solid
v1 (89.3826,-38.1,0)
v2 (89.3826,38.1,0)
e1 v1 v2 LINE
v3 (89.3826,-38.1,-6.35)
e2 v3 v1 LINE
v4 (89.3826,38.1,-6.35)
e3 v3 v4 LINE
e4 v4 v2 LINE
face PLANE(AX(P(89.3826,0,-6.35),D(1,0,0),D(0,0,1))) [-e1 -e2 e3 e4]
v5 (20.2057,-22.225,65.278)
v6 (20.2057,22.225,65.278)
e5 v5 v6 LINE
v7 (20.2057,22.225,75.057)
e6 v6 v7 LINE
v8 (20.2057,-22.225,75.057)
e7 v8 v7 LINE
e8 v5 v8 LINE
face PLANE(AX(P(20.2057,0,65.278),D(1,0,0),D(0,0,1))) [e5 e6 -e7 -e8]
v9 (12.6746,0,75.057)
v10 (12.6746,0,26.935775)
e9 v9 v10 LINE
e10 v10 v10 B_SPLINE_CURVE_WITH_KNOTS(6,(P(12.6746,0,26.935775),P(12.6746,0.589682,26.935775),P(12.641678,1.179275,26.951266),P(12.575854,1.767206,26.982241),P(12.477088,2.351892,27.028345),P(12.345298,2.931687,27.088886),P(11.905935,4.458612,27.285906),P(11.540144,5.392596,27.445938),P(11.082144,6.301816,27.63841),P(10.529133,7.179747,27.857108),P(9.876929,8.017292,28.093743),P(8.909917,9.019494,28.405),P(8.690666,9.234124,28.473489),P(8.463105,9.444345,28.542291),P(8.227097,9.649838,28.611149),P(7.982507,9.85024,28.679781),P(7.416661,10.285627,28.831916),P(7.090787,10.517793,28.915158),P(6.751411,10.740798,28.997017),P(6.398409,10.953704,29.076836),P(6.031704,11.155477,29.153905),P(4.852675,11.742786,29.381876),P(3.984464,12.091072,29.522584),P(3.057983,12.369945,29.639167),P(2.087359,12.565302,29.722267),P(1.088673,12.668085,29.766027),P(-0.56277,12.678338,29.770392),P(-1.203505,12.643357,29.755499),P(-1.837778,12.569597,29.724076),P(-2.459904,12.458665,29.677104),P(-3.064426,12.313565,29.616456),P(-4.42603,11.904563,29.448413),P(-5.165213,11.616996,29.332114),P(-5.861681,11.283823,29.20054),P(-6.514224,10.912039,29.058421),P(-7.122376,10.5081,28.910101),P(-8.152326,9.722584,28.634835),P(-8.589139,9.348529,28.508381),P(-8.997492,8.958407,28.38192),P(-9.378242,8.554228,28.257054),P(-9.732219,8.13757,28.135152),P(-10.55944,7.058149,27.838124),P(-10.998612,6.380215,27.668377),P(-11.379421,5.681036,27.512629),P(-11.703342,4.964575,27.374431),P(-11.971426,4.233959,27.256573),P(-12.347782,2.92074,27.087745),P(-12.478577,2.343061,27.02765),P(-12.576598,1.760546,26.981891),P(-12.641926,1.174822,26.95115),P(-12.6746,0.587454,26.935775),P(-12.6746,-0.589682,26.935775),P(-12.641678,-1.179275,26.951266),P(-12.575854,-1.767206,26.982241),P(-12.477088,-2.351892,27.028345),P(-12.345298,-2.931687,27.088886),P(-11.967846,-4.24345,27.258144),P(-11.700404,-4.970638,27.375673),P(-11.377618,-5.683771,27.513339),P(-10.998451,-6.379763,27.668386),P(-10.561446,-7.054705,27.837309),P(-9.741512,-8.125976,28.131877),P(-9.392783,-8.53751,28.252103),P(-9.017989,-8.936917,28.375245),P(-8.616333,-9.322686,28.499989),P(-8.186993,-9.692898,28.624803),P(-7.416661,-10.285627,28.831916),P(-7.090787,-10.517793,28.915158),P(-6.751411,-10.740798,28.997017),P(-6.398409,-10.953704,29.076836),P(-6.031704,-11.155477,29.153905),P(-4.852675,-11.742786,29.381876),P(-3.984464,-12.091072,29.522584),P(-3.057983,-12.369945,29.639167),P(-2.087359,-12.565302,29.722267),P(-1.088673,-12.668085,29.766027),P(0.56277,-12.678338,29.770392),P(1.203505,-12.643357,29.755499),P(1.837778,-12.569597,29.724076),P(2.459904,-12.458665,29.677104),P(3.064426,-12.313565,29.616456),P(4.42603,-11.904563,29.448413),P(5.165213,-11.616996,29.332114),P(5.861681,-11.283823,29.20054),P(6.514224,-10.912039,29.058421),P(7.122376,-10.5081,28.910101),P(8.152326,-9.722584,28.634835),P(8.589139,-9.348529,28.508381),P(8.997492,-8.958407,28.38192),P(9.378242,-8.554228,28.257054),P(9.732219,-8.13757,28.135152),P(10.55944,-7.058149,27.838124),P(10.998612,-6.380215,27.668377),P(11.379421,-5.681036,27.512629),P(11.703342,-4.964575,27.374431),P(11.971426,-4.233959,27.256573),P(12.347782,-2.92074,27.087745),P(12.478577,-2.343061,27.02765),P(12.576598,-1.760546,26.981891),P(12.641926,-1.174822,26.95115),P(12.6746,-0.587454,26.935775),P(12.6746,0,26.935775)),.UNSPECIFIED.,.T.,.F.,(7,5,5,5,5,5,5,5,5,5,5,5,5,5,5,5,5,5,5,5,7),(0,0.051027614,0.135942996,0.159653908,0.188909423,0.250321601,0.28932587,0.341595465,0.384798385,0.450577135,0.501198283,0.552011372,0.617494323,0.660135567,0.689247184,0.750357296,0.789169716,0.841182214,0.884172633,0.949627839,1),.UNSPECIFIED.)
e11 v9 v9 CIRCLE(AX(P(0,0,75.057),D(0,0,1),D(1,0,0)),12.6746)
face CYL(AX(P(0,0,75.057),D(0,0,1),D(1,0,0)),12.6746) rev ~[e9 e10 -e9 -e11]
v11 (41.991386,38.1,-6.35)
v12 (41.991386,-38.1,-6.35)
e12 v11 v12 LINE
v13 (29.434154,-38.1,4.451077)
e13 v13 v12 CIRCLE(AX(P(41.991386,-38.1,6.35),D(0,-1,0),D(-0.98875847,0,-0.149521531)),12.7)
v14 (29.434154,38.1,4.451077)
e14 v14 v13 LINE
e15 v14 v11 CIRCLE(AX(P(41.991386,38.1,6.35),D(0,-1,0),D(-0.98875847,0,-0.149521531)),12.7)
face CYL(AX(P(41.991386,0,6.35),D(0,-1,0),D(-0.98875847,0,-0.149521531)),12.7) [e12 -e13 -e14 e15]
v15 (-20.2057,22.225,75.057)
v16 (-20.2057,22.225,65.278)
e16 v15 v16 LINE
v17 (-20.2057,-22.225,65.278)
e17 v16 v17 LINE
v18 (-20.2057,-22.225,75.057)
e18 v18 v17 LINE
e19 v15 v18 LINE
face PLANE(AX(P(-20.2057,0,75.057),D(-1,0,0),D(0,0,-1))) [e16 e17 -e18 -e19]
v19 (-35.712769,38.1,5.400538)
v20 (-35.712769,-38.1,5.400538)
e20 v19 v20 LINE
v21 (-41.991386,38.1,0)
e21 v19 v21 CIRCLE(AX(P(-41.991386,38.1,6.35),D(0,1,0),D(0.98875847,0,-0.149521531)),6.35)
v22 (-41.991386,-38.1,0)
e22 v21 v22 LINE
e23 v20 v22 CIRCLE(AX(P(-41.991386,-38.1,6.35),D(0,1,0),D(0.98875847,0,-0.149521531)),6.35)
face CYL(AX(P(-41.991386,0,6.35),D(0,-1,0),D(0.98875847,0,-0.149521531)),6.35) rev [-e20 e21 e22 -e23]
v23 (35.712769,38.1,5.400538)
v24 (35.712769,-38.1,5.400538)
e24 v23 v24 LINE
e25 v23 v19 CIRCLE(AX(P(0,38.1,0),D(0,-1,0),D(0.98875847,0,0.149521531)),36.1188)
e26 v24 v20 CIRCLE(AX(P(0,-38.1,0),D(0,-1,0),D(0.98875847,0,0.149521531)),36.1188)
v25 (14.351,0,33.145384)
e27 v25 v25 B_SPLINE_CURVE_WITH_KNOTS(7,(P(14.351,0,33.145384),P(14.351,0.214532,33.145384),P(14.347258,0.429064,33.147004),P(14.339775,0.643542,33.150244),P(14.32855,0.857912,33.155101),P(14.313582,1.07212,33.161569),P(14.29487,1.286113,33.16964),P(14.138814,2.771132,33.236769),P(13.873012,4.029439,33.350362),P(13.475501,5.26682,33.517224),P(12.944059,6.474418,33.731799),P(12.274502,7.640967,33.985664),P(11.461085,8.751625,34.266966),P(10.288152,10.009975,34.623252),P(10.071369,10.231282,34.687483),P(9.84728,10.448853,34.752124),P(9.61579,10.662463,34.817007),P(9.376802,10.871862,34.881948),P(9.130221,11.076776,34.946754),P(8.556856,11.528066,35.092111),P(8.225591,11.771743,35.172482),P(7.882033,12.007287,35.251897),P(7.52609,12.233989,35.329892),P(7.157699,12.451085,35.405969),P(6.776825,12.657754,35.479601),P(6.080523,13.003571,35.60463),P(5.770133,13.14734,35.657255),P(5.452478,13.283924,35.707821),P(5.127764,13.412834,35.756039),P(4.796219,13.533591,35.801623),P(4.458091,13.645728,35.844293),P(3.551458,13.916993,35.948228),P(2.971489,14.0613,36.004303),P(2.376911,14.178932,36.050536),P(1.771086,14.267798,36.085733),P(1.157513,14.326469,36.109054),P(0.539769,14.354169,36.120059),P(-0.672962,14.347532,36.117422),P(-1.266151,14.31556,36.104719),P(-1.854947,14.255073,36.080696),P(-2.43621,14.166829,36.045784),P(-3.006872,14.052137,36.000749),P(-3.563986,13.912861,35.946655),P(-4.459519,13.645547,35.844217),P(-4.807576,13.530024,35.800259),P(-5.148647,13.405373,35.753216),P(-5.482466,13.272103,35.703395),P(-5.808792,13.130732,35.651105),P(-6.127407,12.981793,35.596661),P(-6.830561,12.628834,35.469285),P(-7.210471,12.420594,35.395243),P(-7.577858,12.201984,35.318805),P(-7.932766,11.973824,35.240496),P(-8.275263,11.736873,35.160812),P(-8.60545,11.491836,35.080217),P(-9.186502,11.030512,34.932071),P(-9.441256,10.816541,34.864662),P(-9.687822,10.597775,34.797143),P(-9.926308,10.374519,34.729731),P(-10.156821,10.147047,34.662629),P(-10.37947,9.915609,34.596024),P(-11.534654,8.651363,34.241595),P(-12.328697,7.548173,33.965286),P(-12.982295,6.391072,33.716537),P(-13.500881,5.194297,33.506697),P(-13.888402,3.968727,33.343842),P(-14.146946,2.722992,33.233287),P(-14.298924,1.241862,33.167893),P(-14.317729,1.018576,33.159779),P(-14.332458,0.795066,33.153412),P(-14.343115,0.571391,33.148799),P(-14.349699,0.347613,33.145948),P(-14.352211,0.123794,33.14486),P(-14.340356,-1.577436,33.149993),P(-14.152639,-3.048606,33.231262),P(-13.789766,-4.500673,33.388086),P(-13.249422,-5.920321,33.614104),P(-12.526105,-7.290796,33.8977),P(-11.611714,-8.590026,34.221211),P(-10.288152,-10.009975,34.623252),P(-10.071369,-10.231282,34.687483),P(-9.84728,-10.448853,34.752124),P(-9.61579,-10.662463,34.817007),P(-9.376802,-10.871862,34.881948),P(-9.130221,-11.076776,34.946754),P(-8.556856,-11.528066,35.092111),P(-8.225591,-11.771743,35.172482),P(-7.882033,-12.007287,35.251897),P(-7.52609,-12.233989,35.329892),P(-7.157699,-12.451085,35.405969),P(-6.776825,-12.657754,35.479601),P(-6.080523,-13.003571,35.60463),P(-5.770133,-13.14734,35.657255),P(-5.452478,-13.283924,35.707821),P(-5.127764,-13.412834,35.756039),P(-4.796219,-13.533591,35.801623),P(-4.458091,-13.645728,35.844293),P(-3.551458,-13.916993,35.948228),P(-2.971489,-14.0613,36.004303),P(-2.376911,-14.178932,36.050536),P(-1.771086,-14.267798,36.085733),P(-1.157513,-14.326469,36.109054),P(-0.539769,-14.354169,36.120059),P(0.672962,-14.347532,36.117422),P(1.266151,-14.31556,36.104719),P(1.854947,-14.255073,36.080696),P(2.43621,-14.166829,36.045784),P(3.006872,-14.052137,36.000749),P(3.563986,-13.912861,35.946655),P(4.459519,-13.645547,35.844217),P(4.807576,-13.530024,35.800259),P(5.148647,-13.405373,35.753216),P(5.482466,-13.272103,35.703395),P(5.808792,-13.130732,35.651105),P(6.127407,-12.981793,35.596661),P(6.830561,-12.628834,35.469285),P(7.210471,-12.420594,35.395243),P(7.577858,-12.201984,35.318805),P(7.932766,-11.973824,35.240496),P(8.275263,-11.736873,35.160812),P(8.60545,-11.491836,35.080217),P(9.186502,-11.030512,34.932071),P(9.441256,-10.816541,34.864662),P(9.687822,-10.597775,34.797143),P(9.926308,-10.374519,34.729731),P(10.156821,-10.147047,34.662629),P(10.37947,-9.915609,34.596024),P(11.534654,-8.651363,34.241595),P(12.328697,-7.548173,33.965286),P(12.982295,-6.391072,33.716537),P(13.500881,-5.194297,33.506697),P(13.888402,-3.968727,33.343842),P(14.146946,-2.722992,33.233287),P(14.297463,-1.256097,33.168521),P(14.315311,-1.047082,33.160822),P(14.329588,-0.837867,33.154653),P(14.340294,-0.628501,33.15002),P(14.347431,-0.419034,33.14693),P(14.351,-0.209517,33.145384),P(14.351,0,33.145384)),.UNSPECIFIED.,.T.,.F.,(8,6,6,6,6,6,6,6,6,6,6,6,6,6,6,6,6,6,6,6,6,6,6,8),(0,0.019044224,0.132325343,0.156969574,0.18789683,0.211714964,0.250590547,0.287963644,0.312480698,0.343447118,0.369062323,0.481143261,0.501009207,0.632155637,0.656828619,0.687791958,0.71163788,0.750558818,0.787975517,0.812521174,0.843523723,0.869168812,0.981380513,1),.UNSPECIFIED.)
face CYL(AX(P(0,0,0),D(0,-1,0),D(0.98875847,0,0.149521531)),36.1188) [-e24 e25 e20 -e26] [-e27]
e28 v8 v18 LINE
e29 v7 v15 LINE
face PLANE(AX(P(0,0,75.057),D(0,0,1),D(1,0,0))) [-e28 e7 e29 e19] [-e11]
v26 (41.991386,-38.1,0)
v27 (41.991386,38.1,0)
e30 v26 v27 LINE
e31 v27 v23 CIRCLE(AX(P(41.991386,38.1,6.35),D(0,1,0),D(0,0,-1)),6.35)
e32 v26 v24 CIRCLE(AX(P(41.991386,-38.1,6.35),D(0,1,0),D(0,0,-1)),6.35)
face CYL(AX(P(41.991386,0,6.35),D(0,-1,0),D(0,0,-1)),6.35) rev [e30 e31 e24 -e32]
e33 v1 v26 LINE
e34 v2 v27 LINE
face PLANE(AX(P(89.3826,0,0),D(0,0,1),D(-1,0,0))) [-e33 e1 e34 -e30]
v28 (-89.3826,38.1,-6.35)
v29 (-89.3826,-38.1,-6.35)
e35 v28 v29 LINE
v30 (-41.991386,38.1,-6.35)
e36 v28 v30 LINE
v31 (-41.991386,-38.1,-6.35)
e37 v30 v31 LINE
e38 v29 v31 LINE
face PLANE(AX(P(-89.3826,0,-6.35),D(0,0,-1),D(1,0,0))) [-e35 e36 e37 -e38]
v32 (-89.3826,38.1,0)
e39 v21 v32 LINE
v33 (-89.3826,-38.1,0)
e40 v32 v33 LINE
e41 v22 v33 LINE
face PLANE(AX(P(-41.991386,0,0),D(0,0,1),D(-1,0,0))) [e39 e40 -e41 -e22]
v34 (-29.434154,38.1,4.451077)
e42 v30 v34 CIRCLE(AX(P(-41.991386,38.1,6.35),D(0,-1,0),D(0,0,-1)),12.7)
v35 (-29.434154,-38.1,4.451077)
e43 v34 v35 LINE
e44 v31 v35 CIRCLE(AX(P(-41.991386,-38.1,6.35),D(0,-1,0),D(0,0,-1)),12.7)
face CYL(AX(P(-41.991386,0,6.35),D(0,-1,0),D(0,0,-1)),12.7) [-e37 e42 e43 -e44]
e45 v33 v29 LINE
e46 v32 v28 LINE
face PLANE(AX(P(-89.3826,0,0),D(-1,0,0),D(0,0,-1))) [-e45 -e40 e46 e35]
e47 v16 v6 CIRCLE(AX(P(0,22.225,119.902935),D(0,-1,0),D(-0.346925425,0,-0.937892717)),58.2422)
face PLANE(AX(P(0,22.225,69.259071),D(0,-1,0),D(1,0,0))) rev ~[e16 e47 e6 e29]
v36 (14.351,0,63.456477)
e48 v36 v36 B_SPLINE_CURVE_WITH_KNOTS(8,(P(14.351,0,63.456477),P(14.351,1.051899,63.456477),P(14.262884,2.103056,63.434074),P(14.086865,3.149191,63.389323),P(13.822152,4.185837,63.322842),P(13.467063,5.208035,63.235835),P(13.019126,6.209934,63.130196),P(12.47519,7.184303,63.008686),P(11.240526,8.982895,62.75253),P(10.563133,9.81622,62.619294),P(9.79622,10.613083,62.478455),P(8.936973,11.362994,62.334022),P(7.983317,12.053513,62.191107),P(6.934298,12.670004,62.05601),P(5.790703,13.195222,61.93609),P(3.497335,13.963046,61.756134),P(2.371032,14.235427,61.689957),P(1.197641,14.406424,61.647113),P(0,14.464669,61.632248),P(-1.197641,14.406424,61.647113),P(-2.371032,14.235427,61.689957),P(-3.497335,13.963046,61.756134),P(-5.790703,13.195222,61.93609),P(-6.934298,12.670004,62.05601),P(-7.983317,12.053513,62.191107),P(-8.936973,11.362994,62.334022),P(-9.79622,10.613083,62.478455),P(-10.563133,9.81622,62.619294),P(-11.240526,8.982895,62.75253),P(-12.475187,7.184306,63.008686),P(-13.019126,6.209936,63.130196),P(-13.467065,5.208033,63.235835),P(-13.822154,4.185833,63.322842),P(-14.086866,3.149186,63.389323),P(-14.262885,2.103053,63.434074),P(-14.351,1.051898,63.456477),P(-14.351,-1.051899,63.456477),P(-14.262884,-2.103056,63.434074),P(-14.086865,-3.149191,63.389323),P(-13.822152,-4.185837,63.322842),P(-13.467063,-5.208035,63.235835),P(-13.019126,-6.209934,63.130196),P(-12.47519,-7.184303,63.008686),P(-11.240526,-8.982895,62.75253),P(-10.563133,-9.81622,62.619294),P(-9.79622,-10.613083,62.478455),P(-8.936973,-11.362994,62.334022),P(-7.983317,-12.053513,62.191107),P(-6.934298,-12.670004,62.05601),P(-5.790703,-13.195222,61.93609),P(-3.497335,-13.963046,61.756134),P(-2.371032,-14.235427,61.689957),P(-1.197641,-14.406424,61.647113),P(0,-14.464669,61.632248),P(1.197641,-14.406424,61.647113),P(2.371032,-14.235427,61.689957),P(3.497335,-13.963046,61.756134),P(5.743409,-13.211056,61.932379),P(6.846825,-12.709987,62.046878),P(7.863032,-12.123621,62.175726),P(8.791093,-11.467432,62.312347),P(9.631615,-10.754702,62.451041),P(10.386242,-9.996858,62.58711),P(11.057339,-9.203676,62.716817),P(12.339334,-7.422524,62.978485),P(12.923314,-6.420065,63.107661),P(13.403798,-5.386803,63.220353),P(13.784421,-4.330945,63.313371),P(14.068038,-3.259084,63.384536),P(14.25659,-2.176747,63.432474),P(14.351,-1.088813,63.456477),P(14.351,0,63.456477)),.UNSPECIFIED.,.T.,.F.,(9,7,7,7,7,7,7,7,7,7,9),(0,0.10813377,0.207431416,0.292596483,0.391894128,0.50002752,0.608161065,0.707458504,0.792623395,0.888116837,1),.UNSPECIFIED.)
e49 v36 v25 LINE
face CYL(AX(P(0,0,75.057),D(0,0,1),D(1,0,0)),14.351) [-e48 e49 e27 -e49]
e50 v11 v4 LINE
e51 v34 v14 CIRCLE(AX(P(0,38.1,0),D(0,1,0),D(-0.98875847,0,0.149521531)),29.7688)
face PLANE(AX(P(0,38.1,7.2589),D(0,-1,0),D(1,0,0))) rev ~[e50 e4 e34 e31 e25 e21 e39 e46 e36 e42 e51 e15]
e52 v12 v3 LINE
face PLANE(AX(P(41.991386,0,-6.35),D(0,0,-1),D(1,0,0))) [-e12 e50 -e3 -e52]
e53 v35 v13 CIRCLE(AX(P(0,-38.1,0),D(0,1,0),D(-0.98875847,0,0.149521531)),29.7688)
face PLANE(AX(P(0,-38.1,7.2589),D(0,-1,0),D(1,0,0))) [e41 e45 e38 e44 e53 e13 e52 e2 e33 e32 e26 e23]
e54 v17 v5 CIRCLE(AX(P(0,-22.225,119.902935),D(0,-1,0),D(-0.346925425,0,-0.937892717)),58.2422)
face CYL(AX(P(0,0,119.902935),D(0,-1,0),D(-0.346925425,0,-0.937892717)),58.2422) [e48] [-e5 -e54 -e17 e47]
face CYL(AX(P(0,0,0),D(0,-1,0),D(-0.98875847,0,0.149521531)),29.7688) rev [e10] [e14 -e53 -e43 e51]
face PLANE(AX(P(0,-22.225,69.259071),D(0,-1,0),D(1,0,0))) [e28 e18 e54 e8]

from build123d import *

# Parameters (mm, degrees)
F1_DEPTH = 38.1
F3_DEPTH = 22.225
F4_R     = 14.351
F5_REACH = 121.9987572146
F6_R     = 12.6746
F7_DEPTH = 81.4079995473


# Not quite as in the source:
# - a feature names something its author has since deleted; it is built from what else it names


with BuildPart() as f1:
    # F0 (on Front) → F1 (new body, symmetric)
    with BuildSketch(Plane.XZ):
        with BuildLine():
            ThreePointArc((41.9913857052, 0), (37.8505272155, 1.5358758877), (35.7127694215, 5.4005382775))
            ThreePointArc((35.7127694215, 5.4005382775), (0, 36.1188), (-35.7127694215, 5.4005382775))
            ThreePointArc((-35.7127694215, 5.4005382775), (-37.8505272155, 1.5358758877), (-41.9913857052, 0))
            Line((-41.9913857052, 0), (-89.3826, 0))
            Line((-89.3826, 0), (-89.3826, -6.3499995473))
            Line((-89.3826, -6.3499995473), (-41.9913857052, -6.3499995473))
            ThreePointArc((-41.9913857052, -6.3499995473), (-33.7096690211, -3.2782478815), (-29.4341535854, 4.4510766227))
            ThreePointArc((-29.4341535854, 4.4510766227), (0, 29.7688004527), (29.4341535854, 4.4510766227))
            ThreePointArc((29.4341535854, 4.4510766227), (33.7096690211, -3.2782478815), (41.9913857052, -6.3499995473))
            Line((41.9913857052, -6.3499995473), (89.3826, -6.3499995473))
            Line((89.3826, -6.3499995473), (89.3826, 0))
            Line((89.3826, 0), (41.9913857052, 0))
        make_face()
    extrude(amount=F1_DEPTH, both=True)



with BuildPart() as f3:
    # F2 (on Front) → F3 (new body, symmetric)
    with BuildSketch(Plane.XZ):
        with BuildLine():
            Line((20.2057, 75.057), (0, 75.057))
            Line((0, 75.057), (-20.2057, 75.057))
            Line((-20.2057, 75.057), (-20.2057, 65.278))
            ThreePointArc((-20.2057, 65.278), (0, 61.6607352251), (20.2057, 65.278))
            Line((20.2057, 65.278), (20.2057, 75.057))
        make_face()
    extrude(amount=F3_DEPTH, both=True)


with BuildPart() as f1_1:
    add(f1.part)

    add(f3.part)  # F5 merges F3
    f5_end = f1_1.faces().sort_by_distance((0, 0, 36.1188))[0]
    # F4 (on face) → F5 (join, up to a face of the model that its end follows)
    with BuildSketch(Plane.XY.offset(75.057)):
        Circle(F4_R)
    f5_long = extrude(amount=-F5_REACH, mode=Mode.PRIVATE)
    add(split(f5_long, bisect_by=f5_end, keep=Keep.TOP, mode=Mode.PRIVATE))

    # F6 (on face) → F7 (cut, through all)
    with BuildSketch(Plane.XY.offset(75.057)):
        Circle(F6_R)
    extrude(amount=-F7_DEPTH, mode=Mode.SUBTRACT)


solid = f1_1.part
